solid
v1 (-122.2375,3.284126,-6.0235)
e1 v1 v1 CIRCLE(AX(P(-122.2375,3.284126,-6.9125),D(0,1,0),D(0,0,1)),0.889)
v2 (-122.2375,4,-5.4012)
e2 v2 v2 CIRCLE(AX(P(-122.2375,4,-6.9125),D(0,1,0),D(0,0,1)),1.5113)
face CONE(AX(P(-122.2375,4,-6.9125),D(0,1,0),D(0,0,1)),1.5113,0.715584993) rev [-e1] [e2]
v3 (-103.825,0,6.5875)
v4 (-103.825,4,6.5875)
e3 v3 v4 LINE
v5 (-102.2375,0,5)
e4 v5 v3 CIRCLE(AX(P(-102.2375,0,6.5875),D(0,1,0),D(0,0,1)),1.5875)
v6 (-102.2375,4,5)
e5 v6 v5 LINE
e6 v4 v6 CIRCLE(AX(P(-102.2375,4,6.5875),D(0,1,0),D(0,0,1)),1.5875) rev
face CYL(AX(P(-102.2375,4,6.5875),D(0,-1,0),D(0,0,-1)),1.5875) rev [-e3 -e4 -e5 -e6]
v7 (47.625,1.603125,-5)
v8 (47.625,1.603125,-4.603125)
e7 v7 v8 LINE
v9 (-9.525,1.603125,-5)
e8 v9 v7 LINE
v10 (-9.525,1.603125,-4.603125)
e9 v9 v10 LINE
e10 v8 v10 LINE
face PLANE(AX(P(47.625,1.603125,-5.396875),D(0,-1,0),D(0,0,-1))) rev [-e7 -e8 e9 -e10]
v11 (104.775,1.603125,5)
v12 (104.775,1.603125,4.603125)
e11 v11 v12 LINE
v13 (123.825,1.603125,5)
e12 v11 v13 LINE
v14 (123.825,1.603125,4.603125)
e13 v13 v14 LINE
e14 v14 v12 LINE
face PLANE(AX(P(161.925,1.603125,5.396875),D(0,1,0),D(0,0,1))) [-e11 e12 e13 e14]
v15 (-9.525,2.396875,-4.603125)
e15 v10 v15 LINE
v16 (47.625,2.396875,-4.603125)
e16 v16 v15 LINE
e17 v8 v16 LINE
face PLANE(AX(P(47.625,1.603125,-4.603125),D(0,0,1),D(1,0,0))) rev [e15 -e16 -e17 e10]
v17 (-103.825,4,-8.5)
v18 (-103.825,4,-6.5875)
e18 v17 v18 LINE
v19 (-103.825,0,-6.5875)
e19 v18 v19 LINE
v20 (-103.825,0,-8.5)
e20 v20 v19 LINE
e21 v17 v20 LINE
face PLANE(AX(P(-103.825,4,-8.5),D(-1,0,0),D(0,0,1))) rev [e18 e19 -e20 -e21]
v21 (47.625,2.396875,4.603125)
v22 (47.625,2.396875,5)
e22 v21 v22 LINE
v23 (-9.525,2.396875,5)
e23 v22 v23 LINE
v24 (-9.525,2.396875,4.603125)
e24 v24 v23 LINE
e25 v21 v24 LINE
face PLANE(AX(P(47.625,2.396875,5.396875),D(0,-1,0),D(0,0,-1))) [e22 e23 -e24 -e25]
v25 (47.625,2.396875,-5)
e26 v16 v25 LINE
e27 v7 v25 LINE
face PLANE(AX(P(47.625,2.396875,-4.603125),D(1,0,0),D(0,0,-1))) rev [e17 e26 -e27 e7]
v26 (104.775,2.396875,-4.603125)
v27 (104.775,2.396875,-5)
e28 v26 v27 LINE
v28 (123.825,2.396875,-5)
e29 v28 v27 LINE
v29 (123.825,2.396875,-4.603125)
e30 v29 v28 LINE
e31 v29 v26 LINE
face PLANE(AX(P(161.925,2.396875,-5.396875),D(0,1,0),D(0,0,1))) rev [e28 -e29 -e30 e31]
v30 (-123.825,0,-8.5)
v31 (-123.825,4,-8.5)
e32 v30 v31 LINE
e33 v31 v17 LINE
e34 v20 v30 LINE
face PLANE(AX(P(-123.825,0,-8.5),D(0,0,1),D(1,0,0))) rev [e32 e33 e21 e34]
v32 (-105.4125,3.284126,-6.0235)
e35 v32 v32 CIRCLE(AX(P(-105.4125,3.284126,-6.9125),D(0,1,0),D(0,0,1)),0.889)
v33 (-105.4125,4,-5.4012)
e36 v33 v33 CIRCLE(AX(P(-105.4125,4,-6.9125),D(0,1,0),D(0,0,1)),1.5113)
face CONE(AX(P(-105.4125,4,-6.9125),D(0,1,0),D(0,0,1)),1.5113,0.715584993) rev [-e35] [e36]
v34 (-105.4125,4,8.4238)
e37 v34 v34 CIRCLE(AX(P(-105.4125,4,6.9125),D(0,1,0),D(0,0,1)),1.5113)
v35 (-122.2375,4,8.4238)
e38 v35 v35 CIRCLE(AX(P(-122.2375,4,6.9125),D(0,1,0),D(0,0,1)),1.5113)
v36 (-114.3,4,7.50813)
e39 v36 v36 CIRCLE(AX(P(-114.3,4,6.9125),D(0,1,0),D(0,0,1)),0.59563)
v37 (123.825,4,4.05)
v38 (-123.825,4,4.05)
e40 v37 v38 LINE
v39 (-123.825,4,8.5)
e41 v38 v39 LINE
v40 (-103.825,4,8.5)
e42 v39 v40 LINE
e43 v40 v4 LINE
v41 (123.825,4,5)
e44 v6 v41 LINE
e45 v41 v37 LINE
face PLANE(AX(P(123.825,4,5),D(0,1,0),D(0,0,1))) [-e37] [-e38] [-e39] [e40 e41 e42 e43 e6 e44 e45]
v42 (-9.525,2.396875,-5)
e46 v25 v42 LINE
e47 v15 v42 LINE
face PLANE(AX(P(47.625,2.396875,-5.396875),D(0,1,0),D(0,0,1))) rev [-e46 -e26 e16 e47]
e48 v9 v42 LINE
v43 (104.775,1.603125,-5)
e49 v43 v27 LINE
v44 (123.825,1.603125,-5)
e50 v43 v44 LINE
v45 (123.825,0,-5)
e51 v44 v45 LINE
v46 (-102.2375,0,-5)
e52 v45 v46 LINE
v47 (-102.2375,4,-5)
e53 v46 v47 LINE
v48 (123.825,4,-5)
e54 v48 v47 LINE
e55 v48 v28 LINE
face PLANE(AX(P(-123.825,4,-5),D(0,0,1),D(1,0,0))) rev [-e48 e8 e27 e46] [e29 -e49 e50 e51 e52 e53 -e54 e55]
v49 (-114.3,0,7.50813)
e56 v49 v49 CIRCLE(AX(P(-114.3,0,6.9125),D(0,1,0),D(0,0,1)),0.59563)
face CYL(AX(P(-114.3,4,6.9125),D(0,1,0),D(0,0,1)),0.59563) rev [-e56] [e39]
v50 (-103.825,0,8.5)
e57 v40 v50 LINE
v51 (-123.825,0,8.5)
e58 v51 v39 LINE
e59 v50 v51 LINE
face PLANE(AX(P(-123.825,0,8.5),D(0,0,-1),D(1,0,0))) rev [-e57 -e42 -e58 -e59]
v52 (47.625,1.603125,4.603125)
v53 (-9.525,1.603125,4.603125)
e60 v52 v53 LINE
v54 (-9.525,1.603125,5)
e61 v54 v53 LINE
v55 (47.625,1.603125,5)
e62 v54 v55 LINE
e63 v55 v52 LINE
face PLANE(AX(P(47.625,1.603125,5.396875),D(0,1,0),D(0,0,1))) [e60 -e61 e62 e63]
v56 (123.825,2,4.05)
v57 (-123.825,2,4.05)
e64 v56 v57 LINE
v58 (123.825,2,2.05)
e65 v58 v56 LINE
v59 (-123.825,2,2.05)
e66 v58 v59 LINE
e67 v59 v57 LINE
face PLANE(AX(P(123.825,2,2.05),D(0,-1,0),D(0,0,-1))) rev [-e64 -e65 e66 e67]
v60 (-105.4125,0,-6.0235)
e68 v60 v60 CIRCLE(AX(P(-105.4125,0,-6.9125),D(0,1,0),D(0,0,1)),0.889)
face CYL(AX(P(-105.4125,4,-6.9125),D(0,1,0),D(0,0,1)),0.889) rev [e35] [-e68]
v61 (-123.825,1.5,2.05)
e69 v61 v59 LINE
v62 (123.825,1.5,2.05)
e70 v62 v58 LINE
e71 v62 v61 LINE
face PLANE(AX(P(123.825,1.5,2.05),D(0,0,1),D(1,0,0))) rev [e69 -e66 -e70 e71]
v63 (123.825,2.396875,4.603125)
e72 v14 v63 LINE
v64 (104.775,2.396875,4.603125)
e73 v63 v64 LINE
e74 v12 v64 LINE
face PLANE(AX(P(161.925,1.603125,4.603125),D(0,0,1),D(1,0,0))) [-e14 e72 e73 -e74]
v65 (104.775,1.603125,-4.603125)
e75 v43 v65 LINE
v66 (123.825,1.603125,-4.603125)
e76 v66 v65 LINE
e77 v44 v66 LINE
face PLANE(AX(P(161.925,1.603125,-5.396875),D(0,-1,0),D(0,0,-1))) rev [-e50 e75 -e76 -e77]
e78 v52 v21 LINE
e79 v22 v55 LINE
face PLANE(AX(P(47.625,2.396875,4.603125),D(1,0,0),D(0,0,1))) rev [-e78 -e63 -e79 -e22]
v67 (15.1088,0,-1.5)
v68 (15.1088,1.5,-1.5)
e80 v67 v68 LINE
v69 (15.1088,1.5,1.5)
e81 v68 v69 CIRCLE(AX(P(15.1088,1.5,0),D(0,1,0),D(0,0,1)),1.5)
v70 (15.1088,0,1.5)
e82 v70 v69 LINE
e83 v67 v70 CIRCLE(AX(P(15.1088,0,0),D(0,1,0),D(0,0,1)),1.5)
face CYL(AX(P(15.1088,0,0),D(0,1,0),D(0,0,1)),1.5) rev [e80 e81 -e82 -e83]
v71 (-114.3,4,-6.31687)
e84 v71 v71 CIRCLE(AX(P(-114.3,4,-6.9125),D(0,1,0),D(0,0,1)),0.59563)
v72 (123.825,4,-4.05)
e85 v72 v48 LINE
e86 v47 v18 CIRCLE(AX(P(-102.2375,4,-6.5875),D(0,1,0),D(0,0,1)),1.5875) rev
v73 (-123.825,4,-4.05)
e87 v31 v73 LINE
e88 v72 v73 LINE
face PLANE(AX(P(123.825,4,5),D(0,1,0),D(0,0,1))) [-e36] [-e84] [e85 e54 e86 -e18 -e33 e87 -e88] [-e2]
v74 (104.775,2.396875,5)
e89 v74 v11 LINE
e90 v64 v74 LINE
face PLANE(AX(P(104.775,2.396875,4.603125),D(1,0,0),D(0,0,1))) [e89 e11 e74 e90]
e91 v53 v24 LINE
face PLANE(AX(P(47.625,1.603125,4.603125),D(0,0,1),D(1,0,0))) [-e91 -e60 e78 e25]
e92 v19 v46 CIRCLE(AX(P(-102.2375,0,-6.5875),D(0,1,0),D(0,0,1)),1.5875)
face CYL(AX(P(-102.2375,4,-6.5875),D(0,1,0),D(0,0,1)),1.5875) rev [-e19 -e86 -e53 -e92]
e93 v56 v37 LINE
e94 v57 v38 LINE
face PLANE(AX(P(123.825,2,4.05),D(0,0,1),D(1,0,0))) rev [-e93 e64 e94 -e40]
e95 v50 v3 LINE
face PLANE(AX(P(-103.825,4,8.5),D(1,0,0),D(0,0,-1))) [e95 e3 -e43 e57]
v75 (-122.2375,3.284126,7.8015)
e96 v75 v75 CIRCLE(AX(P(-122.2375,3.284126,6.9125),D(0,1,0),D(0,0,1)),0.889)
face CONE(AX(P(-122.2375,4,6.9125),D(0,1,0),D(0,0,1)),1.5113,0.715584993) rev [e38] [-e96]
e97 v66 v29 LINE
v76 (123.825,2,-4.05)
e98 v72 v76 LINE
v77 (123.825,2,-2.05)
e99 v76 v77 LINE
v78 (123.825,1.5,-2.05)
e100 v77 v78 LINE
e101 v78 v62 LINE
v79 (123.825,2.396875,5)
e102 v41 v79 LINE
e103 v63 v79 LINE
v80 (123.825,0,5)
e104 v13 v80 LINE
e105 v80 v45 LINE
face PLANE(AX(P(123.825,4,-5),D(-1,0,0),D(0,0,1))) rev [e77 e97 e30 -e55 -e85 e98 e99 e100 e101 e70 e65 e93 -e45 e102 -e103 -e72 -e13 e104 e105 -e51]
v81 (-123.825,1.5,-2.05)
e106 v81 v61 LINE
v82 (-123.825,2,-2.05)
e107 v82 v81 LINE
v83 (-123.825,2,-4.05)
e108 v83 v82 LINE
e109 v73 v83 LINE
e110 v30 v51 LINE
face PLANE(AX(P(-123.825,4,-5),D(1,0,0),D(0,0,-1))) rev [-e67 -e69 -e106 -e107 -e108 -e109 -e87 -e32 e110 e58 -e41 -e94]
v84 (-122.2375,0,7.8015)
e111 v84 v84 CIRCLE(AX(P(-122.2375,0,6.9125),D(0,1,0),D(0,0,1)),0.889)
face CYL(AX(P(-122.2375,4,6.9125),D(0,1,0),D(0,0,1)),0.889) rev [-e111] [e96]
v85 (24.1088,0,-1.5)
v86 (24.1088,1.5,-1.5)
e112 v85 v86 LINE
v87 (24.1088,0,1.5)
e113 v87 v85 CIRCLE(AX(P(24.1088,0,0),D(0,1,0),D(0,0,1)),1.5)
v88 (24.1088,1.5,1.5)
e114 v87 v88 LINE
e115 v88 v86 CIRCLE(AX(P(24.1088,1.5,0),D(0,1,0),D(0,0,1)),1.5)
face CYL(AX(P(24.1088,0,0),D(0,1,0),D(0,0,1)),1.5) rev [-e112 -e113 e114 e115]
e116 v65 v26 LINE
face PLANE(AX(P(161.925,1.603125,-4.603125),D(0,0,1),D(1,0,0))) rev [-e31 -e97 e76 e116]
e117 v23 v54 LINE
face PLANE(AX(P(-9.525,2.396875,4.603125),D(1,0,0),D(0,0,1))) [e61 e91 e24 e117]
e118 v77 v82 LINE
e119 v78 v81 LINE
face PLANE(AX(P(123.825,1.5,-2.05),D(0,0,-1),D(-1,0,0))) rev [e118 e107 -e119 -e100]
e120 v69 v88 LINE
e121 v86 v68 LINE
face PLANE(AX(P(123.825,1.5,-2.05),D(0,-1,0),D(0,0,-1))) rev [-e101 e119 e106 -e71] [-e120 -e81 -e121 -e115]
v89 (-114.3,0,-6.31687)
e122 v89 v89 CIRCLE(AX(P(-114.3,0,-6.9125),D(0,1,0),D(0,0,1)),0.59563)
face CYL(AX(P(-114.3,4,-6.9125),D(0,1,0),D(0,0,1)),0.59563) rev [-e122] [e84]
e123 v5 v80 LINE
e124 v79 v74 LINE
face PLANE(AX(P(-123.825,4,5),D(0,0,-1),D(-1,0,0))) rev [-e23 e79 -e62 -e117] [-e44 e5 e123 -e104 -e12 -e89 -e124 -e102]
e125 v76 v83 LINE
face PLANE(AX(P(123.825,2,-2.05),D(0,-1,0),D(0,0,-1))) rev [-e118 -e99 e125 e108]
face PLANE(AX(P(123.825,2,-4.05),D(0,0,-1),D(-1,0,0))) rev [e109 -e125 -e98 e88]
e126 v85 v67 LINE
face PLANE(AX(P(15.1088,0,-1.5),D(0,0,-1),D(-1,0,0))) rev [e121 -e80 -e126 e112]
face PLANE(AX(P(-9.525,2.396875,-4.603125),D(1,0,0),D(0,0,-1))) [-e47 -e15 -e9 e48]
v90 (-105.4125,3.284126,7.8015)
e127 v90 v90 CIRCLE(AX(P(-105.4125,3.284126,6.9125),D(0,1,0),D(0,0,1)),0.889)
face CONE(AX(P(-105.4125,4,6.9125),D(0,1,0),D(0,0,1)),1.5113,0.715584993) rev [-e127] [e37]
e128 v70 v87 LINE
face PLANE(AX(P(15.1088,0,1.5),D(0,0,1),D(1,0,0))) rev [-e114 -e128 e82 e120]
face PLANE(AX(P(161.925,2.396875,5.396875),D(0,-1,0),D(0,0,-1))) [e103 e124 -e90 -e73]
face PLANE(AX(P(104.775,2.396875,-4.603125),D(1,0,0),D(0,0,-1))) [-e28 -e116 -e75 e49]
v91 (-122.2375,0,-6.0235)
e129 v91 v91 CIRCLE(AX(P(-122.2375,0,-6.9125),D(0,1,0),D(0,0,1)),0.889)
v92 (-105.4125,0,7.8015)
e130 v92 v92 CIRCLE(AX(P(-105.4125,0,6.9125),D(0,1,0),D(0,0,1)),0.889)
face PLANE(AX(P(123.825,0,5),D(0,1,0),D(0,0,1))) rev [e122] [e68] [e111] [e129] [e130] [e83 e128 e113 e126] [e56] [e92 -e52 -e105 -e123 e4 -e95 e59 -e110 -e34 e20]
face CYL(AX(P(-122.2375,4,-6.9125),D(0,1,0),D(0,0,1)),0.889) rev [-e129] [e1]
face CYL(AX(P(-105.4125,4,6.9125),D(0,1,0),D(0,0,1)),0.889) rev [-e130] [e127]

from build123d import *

# Parameters (mm, degrees)
SKETCH1_W                                      = 247.65
SKETCH1_H                                      = 10
BOSS_EXTRUDE1_DEPTH                            = 4
CUT_EXTRUDE1_DEPTH                             = 248.732764284
CUT_EXTRUDE2_DEPTH                             = 1.5
CUT_EXTRUDE3_START                             = -114.3
SKETCH13_W                                     = 0.79375
SKETCH13_H                                     = 0.79375
CUT_EXTRUDE3_DEPTH                             = 57.15
LPATTERN1_COUNT                                = 2
LPATTERN1_PITCH                                = 114.3
SKETCH14_W                                     = 20
SKETCH14_H                                     = 4
BOSS_EXTRUDE3_DEPTH                            = 3.5
F_0_80_TAPPED_HOLE2_D                          = 1.19126
CSK_FOR_0_FLAT_HEAD_MACHINE_SCREW1_D           = 1.778
CSK_FOR_0_FLAT_HEAD_MACHINE_SCREW1_CSINK_D     = 3.0226
CSK_FOR_0_FLAT_HEAD_MACHINE_SCREW1_CSINK_ANGLE = 82
MIRROR3_START                                  = -114.3
MIRROR3_COPY_1_SKETCH_W                        = 0.79375
MIRROR3_COPY_1_SKETCH_H                        = 0.79375
MIRROR3_COPY_1_DEPTH                           = 57.15
FILLET6_R                                      = 1.5875


# Read off the part's stored shape, not the designer's step: Cut-Extrude2
with BuildPart() as part:
    # Sketch1 → Boss-Extrude1 (new body)
    with BuildSketch(Plane(origin=(0, 0, 0), x_dir=(1, 0, 0), z_dir=(0, 1, 0))):
        Rectangle(SKETCH1_W, SKETCH1_H)
    extrude(amount=BOSS_EXTRUDE1_DEPTH)

    # Sketch2 → Cut-Extrude1 (cut, through all)
    with BuildSketch(Plane.ZY.offset(123.825)):
        Polygon((-2.05, 1.5), (2.05, 1.5), (2.05, 2), (4.05, 2), (4.05, 4), (-4.05, 4), (-4.05, 2), (-2.05, 2), align=None)
    extrude(amount=-CUT_EXTRUDE1_DEPTH, mode=Mode.SUBTRACT)

    # Cut-Extrude2 outline → Cut-Extrude2 (cut)
    with BuildSketch(Plane(origin=(0, 0, 0), x_dir=(1, 0, 0), z_dir=(0, 1, 0))):
        with BuildLine():
            Line((24.1088, 1.5), (15.1088, 1.5))
            ThreePointArc((15.1088, 1.5), (13.6088, 0), (15.1088, -1.5))
            Line((15.1088, -1.5), (24.1088, -1.5))
            ThreePointArc((24.1088, -1.5), (25.6088, 0), (24.1088, 1.5))
        make_face()
    extrude(amount=CUT_EXTRUDE2_DEPTH, mode=Mode.SUBTRACT)

    # Sketch13 → Cut-Extrude3 (cut)
    with BuildSketch(Plane.ZY.offset(123.825).offset(CUT_EXTRUDE3_START)):
        with Locations((-5, 2)):
            Rectangle(SKETCH13_W, SKETCH13_H)
    cut_extrude3 = extrude(amount=-CUT_EXTRUDE3_DEPTH, mode=Mode.SUBTRACT)

    # LPattern1: Cut-Extrude3 ×2
    with Locations(*[(i * LPATTERN1_PITCH, 0, 0) for i in range(1, LPATTERN1_COUNT)]):
        add(cut_extrude3, mode=Mode.SUBTRACT)

    # Sketch14 → Boss-Extrude3 (add)
    with BuildSketch(Plane(origin=(0, 0, -5), x_dir=(-1, 0, 0), z_dir=(0, 0, -1))):
        with Locations((113.825, 2)):
            Rectangle(SKETCH14_W, SKETCH14_H)
    boss_extrude3 = extrude(amount=BOSS_EXTRUDE3_DEPTH)

    # #0-80 Tapped Hole2 (through all)
    with Locations(Plane(origin=(0, 4, 0), x_dir=(-1, 0, 0), z_dir=(0, 1, 0))):
        with Locations((114.3, -6.9125)):
            f_0_80_tapped_hole2 = Hole(F_0_80_TAPPED_HOLE2_D / 2)

    # CSK for #0 Flat Head Machine Screw1 (through all)
    with Locations(Plane(origin=(0, 4, 0), x_dir=(-1, 0, 0), z_dir=(0, 1, 0))):
        with Locations((105.4125, -6.9125), (122.2375, -6.9125)):
            csk_for_0_flat_head_machine_screw1 = CounterSinkHole(CSK_FOR_0_FLAT_HEAD_MACHINE_SCREW1_D / 2, CSK_FOR_0_FLAT_HEAD_MACHINE_SCREW1_CSINK_D / 2, counter_sink_angle=CSK_FOR_0_FLAT_HEAD_MACHINE_SCREW1_CSINK_ANGLE)

    # Mirror3: Cut-Extrude3, Boss-Extrude3, #0-80 Tapped Hole2, CSK for #0 Flat Head Machine Screw1 across plane
    add(cut_extrude3.mirror(Plane.XY), mode=Mode.SUBTRACT)
    add(boss_extrude3.mirror(Plane.XY))
    add(f_0_80_tapped_hole2.mirror(Plane.XY), mode=Mode.SUBTRACT)
    add(csk_for_0_flat_head_machine_screw1.mirror(Plane.XY), mode=Mode.SUBTRACT)

    # Mirror3 copy 1 sketch → Mirror3 copy 1 (cut)
    with BuildSketch(Plane(origin=(-9.525, 0, 0), x_dir=(0, 0, -1), z_dir=(-1, 0, 0)).offset(MIRROR3_START)):
        with Locations((-5, -2)):
            Rectangle(MIRROR3_COPY_1_SKETCH_W, MIRROR3_COPY_1_SKETCH_H)
    extrude(amount=-MIRROR3_COPY_1_DEPTH, mode=Mode.SUBTRACT)

    # Fillet6
    fillet6_edges = [part.edges().sort_by_distance(p)[0] for p in [
        (-103.825, 2, -5),
        (-103.825, 2, 5),
    ]]
    fillet(fillet6_edges, radius=FILLET6_R)


solid = part.part
